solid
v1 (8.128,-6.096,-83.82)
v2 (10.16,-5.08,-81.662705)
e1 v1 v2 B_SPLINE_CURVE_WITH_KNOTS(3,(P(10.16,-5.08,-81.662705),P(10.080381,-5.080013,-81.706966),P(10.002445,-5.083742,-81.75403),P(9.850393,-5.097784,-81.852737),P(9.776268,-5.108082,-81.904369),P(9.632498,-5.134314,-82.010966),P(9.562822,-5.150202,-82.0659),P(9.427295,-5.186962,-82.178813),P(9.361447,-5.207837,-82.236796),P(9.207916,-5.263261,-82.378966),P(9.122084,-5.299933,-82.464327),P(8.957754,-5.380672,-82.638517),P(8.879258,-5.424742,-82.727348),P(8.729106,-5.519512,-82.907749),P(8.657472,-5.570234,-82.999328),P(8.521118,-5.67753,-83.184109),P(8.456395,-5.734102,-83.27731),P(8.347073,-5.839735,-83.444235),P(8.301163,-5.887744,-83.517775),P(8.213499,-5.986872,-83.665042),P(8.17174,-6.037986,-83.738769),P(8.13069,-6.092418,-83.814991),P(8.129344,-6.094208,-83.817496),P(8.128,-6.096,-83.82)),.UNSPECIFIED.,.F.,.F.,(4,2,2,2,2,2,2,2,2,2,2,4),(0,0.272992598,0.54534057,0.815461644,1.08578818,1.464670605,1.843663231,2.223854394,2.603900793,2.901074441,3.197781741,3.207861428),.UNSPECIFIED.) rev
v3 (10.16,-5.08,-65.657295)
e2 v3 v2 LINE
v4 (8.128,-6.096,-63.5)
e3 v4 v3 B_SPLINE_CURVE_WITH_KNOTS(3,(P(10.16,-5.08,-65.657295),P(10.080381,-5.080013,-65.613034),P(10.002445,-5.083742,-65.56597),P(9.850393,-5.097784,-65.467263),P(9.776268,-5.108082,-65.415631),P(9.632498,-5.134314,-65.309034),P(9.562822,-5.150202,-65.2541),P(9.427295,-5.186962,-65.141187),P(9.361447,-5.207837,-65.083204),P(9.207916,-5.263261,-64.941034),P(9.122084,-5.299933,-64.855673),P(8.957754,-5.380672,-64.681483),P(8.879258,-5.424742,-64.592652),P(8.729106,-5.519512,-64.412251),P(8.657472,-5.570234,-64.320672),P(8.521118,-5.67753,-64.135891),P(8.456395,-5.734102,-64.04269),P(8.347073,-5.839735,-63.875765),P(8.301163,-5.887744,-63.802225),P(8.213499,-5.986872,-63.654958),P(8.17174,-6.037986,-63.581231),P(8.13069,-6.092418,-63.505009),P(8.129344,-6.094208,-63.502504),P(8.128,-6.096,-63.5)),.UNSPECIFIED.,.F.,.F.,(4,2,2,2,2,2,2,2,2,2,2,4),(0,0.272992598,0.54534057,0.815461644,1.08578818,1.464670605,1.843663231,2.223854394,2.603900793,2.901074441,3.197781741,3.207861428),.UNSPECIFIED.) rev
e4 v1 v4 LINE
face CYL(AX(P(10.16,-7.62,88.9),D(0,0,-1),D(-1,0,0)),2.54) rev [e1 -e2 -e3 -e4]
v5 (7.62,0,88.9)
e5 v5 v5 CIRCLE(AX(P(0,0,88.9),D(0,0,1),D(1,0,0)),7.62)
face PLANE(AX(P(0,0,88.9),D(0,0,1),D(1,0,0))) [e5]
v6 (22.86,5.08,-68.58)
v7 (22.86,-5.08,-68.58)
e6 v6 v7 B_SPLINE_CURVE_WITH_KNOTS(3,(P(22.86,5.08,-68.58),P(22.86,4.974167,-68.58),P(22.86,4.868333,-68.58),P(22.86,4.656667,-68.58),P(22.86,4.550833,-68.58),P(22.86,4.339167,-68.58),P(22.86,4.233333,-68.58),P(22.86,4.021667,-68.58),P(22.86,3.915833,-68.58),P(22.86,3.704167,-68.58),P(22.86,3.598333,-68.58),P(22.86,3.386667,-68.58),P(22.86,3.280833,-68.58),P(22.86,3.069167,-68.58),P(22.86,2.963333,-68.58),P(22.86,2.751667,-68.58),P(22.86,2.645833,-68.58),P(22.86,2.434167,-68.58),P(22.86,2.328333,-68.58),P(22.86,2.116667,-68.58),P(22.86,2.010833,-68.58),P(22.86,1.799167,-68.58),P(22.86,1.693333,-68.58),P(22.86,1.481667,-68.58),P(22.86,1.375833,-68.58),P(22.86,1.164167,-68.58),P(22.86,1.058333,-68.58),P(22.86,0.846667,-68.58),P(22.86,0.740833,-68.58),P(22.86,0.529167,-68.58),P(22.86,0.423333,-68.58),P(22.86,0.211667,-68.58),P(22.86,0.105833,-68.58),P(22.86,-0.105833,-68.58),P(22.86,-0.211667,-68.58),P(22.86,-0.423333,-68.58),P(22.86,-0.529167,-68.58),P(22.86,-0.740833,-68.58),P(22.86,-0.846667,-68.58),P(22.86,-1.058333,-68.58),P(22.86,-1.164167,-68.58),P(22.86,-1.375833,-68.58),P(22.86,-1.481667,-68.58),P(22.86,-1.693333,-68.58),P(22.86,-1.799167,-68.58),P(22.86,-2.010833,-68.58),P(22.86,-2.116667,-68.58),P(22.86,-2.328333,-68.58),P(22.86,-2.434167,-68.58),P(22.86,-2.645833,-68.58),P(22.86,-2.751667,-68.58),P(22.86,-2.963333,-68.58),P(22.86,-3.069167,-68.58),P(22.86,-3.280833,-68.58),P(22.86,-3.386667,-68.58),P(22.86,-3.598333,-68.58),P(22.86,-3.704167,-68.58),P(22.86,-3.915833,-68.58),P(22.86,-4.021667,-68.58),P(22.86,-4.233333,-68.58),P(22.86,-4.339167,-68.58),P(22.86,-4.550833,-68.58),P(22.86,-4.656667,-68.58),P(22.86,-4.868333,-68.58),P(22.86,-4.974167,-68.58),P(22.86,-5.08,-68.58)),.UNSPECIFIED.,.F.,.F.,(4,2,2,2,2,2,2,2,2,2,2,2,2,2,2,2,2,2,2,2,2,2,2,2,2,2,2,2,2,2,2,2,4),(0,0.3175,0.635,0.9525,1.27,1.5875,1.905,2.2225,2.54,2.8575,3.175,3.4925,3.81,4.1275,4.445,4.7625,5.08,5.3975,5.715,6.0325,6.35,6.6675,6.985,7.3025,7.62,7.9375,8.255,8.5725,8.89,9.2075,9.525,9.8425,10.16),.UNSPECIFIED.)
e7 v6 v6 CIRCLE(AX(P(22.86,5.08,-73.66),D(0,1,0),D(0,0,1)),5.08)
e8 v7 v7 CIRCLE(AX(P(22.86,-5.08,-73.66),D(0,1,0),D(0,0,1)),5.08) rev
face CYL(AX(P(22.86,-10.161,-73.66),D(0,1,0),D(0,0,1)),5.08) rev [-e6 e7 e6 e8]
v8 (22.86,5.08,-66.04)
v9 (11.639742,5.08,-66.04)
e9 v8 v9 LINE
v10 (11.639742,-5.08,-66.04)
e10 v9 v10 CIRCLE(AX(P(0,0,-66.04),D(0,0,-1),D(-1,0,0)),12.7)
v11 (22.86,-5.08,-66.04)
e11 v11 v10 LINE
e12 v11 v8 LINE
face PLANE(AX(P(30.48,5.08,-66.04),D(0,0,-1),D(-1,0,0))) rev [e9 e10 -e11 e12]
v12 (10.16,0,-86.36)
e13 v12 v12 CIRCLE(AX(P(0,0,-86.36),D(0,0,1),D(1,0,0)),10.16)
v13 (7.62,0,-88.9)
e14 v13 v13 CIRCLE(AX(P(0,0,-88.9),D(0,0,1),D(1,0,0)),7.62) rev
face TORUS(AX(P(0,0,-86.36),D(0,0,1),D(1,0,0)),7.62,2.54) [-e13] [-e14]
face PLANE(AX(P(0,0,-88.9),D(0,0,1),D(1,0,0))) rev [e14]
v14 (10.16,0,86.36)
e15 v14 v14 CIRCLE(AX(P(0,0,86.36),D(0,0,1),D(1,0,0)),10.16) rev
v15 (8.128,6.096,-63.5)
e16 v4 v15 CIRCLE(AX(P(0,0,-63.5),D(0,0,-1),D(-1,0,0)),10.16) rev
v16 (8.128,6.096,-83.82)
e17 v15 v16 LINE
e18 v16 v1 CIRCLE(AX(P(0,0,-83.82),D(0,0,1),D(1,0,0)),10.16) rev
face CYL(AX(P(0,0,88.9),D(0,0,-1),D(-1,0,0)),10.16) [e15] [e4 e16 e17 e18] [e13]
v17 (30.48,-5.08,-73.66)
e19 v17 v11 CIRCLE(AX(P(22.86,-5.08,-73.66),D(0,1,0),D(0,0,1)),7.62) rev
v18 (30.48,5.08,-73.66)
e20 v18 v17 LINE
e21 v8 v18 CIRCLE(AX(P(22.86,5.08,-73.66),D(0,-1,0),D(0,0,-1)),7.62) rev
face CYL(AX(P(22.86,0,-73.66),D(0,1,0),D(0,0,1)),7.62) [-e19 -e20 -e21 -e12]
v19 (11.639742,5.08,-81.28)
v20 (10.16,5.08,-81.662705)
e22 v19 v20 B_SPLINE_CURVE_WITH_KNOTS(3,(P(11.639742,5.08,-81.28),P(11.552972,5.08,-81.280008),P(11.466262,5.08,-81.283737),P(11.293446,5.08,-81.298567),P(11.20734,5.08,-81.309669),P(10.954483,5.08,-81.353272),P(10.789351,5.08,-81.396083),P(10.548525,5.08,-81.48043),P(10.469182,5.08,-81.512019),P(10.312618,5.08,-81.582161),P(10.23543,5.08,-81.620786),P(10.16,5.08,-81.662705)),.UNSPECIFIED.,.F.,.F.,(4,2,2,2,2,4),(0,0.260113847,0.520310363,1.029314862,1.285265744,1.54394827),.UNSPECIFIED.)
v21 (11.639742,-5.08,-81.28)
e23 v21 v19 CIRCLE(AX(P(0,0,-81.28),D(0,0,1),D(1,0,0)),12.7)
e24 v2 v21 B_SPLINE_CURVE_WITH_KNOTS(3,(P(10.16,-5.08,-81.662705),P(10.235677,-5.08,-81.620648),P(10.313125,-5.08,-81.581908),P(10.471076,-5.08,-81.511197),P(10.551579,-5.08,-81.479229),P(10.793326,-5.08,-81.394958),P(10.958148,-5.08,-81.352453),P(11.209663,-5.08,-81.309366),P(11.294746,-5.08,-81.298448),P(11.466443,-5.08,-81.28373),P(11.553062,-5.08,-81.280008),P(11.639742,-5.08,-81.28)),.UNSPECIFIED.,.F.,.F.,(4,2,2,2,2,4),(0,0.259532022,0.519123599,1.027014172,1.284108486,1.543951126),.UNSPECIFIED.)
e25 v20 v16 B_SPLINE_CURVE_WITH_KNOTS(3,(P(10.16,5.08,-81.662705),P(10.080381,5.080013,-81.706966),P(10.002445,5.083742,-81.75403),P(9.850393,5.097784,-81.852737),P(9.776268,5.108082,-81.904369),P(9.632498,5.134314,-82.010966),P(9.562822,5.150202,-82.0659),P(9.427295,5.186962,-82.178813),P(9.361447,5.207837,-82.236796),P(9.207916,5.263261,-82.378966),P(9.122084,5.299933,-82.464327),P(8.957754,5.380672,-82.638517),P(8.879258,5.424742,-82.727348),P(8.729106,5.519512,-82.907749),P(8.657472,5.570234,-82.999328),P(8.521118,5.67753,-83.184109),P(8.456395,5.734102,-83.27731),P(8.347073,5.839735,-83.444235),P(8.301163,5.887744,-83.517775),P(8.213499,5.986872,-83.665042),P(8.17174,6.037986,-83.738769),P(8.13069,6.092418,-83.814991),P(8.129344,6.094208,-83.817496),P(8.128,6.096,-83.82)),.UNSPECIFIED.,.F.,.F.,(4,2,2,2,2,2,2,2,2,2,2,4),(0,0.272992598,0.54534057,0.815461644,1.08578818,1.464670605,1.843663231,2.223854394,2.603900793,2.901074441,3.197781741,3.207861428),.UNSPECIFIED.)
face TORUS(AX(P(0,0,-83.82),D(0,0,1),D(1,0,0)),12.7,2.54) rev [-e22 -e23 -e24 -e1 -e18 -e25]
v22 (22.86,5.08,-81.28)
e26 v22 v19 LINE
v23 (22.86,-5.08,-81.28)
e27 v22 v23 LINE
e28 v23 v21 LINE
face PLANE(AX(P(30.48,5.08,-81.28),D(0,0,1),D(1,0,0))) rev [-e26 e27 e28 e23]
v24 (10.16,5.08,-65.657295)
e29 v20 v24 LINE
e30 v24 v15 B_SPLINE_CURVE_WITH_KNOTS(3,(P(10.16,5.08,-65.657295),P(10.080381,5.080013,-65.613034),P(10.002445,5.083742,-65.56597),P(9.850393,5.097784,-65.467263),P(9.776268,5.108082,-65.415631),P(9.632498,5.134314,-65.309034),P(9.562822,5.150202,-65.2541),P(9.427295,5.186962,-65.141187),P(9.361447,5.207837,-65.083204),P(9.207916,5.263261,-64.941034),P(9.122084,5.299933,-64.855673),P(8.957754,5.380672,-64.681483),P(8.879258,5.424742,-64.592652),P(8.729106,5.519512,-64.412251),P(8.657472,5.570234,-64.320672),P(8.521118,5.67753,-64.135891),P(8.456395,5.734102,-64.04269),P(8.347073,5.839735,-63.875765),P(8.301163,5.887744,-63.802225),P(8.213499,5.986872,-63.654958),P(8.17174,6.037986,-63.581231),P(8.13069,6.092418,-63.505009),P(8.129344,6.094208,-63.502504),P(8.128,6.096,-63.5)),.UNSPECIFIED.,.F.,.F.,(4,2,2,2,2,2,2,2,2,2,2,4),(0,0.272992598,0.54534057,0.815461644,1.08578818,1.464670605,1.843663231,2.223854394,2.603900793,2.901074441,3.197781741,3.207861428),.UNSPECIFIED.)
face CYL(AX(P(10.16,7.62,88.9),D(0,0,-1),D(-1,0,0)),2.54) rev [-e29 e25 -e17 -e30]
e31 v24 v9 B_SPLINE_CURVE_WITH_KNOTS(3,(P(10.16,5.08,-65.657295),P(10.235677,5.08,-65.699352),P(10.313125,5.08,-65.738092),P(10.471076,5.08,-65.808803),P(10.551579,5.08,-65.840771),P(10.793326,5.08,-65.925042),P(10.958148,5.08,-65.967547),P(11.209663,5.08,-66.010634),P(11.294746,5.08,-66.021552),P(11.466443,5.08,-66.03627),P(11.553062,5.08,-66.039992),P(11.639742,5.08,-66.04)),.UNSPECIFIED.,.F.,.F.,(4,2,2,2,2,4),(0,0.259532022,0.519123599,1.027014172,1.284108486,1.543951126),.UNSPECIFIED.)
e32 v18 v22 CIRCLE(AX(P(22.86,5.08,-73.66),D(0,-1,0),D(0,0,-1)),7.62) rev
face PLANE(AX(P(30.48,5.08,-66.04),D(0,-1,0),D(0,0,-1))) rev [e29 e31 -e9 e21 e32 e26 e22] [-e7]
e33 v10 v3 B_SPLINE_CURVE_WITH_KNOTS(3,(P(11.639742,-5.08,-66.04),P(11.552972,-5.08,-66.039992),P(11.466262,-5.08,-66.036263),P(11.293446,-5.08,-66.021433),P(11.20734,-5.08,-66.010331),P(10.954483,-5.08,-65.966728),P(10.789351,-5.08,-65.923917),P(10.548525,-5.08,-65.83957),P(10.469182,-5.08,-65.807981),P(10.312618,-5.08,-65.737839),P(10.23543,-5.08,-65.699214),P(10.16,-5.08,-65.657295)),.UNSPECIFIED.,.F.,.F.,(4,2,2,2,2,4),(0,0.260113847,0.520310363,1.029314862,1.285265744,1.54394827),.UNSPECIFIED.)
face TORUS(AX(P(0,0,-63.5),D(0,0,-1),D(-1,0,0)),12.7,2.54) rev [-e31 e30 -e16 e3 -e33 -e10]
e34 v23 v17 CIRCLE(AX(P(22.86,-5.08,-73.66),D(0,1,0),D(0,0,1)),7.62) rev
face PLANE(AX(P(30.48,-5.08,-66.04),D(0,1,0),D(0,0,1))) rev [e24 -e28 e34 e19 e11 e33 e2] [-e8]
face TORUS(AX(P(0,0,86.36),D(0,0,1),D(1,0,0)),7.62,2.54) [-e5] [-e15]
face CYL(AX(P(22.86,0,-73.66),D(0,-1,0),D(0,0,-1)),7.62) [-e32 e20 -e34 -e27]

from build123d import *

# Parameters (mm, degrees)
SKETCH1_R           = 10.16
BOSS_EXTRUDE1_DEPTH = 88.9
FILLET1_R           = 2.54
SKETCH3_W           = 15.24
SKETCH3_H           = 10.16
BOSS_EXTRUDE2_DEPTH = 30.48
FILLET2_R           = 7.62
CUT_EXTRUDE1_REACH  = 97.208
SKETCH4_R           = 5.08
FILLET3_R           = 2.54


with BuildPart() as part:
    # Sketch1 → Boss-Extrude1 (new, symmetric)
    with BuildSketch(Plane.XY):
        Circle(SKETCH1_R)
    extrude(amount=BOSS_EXTRUDE1_DEPTH, both=True)

    # Fillet1
    fillet1_edges = [part.edges().sort_by_distance(p)[0] for p in [
        (-10.16, 0, -88.9),
        (-10.16, 0, 88.9),
    ]]
    fillet(fillet1_edges, radius=FILLET1_R)

    # Sketch3 → Boss-Extrude2 (add)
    with BuildSketch(Plane(origin=(0, 0, 0), x_dir=(0, 0, -1), z_dir=(1, 0, 0))):
        with Locations((73.66, 0)):
            Rectangle(SKETCH3_W, SKETCH3_H)
    extrude(amount=BOSS_EXTRUDE2_DEPTH)

    # Fillet2
    fillet2_edges = [part.edges().sort_by_distance(p)[0] for p in [
        (30.48, 0, -81.28),
        (30.48, 0, -66.04),
    ]]
    fillet(fillet2_edges, radius=FILLET2_R - 0.0001)  # a hair under: the kernel refuses the full size

    # Sketch4 → Cut-Extrude1 (cut, up to next)
    with BuildSketch(Plane(origin=(0, 5.08, 0), x_dir=(1, 0, 0), z_dir=(0, 1, 0)), mode=Mode.PRIVATE) as cut_extrude1_sk1:
        with Locations(Location((22.86, 73.66, 0), (0, 0, 270))):
            Circle(SKETCH4_R)
    cut_extrude1_tool1 = extrude(cut_extrude1_sk1.sketch, amount=-CUT_EXTRUDE1_REACH, mode=Mode.PRIVATE) & part.part
    add(cut_extrude1_tool1.solids().sort_by_distance((22.86, 5.08, -73.66))[0], mode=Mode.SUBTRACT)

    # Fillet3
    fillet3_edges = [part.edges().sort_by_distance(p)[0] for p in [
        (8.798818102, -5.08, -73.66),
        (9.813806395, 2.629601498, -66.04),
        (8.798818102, 5.08, -73.66),
        (9.813806395, -2.629601498, -81.28),
    ]]
    fillet(fillet3_edges, radius=FILLET3_R)


solid = part.part
